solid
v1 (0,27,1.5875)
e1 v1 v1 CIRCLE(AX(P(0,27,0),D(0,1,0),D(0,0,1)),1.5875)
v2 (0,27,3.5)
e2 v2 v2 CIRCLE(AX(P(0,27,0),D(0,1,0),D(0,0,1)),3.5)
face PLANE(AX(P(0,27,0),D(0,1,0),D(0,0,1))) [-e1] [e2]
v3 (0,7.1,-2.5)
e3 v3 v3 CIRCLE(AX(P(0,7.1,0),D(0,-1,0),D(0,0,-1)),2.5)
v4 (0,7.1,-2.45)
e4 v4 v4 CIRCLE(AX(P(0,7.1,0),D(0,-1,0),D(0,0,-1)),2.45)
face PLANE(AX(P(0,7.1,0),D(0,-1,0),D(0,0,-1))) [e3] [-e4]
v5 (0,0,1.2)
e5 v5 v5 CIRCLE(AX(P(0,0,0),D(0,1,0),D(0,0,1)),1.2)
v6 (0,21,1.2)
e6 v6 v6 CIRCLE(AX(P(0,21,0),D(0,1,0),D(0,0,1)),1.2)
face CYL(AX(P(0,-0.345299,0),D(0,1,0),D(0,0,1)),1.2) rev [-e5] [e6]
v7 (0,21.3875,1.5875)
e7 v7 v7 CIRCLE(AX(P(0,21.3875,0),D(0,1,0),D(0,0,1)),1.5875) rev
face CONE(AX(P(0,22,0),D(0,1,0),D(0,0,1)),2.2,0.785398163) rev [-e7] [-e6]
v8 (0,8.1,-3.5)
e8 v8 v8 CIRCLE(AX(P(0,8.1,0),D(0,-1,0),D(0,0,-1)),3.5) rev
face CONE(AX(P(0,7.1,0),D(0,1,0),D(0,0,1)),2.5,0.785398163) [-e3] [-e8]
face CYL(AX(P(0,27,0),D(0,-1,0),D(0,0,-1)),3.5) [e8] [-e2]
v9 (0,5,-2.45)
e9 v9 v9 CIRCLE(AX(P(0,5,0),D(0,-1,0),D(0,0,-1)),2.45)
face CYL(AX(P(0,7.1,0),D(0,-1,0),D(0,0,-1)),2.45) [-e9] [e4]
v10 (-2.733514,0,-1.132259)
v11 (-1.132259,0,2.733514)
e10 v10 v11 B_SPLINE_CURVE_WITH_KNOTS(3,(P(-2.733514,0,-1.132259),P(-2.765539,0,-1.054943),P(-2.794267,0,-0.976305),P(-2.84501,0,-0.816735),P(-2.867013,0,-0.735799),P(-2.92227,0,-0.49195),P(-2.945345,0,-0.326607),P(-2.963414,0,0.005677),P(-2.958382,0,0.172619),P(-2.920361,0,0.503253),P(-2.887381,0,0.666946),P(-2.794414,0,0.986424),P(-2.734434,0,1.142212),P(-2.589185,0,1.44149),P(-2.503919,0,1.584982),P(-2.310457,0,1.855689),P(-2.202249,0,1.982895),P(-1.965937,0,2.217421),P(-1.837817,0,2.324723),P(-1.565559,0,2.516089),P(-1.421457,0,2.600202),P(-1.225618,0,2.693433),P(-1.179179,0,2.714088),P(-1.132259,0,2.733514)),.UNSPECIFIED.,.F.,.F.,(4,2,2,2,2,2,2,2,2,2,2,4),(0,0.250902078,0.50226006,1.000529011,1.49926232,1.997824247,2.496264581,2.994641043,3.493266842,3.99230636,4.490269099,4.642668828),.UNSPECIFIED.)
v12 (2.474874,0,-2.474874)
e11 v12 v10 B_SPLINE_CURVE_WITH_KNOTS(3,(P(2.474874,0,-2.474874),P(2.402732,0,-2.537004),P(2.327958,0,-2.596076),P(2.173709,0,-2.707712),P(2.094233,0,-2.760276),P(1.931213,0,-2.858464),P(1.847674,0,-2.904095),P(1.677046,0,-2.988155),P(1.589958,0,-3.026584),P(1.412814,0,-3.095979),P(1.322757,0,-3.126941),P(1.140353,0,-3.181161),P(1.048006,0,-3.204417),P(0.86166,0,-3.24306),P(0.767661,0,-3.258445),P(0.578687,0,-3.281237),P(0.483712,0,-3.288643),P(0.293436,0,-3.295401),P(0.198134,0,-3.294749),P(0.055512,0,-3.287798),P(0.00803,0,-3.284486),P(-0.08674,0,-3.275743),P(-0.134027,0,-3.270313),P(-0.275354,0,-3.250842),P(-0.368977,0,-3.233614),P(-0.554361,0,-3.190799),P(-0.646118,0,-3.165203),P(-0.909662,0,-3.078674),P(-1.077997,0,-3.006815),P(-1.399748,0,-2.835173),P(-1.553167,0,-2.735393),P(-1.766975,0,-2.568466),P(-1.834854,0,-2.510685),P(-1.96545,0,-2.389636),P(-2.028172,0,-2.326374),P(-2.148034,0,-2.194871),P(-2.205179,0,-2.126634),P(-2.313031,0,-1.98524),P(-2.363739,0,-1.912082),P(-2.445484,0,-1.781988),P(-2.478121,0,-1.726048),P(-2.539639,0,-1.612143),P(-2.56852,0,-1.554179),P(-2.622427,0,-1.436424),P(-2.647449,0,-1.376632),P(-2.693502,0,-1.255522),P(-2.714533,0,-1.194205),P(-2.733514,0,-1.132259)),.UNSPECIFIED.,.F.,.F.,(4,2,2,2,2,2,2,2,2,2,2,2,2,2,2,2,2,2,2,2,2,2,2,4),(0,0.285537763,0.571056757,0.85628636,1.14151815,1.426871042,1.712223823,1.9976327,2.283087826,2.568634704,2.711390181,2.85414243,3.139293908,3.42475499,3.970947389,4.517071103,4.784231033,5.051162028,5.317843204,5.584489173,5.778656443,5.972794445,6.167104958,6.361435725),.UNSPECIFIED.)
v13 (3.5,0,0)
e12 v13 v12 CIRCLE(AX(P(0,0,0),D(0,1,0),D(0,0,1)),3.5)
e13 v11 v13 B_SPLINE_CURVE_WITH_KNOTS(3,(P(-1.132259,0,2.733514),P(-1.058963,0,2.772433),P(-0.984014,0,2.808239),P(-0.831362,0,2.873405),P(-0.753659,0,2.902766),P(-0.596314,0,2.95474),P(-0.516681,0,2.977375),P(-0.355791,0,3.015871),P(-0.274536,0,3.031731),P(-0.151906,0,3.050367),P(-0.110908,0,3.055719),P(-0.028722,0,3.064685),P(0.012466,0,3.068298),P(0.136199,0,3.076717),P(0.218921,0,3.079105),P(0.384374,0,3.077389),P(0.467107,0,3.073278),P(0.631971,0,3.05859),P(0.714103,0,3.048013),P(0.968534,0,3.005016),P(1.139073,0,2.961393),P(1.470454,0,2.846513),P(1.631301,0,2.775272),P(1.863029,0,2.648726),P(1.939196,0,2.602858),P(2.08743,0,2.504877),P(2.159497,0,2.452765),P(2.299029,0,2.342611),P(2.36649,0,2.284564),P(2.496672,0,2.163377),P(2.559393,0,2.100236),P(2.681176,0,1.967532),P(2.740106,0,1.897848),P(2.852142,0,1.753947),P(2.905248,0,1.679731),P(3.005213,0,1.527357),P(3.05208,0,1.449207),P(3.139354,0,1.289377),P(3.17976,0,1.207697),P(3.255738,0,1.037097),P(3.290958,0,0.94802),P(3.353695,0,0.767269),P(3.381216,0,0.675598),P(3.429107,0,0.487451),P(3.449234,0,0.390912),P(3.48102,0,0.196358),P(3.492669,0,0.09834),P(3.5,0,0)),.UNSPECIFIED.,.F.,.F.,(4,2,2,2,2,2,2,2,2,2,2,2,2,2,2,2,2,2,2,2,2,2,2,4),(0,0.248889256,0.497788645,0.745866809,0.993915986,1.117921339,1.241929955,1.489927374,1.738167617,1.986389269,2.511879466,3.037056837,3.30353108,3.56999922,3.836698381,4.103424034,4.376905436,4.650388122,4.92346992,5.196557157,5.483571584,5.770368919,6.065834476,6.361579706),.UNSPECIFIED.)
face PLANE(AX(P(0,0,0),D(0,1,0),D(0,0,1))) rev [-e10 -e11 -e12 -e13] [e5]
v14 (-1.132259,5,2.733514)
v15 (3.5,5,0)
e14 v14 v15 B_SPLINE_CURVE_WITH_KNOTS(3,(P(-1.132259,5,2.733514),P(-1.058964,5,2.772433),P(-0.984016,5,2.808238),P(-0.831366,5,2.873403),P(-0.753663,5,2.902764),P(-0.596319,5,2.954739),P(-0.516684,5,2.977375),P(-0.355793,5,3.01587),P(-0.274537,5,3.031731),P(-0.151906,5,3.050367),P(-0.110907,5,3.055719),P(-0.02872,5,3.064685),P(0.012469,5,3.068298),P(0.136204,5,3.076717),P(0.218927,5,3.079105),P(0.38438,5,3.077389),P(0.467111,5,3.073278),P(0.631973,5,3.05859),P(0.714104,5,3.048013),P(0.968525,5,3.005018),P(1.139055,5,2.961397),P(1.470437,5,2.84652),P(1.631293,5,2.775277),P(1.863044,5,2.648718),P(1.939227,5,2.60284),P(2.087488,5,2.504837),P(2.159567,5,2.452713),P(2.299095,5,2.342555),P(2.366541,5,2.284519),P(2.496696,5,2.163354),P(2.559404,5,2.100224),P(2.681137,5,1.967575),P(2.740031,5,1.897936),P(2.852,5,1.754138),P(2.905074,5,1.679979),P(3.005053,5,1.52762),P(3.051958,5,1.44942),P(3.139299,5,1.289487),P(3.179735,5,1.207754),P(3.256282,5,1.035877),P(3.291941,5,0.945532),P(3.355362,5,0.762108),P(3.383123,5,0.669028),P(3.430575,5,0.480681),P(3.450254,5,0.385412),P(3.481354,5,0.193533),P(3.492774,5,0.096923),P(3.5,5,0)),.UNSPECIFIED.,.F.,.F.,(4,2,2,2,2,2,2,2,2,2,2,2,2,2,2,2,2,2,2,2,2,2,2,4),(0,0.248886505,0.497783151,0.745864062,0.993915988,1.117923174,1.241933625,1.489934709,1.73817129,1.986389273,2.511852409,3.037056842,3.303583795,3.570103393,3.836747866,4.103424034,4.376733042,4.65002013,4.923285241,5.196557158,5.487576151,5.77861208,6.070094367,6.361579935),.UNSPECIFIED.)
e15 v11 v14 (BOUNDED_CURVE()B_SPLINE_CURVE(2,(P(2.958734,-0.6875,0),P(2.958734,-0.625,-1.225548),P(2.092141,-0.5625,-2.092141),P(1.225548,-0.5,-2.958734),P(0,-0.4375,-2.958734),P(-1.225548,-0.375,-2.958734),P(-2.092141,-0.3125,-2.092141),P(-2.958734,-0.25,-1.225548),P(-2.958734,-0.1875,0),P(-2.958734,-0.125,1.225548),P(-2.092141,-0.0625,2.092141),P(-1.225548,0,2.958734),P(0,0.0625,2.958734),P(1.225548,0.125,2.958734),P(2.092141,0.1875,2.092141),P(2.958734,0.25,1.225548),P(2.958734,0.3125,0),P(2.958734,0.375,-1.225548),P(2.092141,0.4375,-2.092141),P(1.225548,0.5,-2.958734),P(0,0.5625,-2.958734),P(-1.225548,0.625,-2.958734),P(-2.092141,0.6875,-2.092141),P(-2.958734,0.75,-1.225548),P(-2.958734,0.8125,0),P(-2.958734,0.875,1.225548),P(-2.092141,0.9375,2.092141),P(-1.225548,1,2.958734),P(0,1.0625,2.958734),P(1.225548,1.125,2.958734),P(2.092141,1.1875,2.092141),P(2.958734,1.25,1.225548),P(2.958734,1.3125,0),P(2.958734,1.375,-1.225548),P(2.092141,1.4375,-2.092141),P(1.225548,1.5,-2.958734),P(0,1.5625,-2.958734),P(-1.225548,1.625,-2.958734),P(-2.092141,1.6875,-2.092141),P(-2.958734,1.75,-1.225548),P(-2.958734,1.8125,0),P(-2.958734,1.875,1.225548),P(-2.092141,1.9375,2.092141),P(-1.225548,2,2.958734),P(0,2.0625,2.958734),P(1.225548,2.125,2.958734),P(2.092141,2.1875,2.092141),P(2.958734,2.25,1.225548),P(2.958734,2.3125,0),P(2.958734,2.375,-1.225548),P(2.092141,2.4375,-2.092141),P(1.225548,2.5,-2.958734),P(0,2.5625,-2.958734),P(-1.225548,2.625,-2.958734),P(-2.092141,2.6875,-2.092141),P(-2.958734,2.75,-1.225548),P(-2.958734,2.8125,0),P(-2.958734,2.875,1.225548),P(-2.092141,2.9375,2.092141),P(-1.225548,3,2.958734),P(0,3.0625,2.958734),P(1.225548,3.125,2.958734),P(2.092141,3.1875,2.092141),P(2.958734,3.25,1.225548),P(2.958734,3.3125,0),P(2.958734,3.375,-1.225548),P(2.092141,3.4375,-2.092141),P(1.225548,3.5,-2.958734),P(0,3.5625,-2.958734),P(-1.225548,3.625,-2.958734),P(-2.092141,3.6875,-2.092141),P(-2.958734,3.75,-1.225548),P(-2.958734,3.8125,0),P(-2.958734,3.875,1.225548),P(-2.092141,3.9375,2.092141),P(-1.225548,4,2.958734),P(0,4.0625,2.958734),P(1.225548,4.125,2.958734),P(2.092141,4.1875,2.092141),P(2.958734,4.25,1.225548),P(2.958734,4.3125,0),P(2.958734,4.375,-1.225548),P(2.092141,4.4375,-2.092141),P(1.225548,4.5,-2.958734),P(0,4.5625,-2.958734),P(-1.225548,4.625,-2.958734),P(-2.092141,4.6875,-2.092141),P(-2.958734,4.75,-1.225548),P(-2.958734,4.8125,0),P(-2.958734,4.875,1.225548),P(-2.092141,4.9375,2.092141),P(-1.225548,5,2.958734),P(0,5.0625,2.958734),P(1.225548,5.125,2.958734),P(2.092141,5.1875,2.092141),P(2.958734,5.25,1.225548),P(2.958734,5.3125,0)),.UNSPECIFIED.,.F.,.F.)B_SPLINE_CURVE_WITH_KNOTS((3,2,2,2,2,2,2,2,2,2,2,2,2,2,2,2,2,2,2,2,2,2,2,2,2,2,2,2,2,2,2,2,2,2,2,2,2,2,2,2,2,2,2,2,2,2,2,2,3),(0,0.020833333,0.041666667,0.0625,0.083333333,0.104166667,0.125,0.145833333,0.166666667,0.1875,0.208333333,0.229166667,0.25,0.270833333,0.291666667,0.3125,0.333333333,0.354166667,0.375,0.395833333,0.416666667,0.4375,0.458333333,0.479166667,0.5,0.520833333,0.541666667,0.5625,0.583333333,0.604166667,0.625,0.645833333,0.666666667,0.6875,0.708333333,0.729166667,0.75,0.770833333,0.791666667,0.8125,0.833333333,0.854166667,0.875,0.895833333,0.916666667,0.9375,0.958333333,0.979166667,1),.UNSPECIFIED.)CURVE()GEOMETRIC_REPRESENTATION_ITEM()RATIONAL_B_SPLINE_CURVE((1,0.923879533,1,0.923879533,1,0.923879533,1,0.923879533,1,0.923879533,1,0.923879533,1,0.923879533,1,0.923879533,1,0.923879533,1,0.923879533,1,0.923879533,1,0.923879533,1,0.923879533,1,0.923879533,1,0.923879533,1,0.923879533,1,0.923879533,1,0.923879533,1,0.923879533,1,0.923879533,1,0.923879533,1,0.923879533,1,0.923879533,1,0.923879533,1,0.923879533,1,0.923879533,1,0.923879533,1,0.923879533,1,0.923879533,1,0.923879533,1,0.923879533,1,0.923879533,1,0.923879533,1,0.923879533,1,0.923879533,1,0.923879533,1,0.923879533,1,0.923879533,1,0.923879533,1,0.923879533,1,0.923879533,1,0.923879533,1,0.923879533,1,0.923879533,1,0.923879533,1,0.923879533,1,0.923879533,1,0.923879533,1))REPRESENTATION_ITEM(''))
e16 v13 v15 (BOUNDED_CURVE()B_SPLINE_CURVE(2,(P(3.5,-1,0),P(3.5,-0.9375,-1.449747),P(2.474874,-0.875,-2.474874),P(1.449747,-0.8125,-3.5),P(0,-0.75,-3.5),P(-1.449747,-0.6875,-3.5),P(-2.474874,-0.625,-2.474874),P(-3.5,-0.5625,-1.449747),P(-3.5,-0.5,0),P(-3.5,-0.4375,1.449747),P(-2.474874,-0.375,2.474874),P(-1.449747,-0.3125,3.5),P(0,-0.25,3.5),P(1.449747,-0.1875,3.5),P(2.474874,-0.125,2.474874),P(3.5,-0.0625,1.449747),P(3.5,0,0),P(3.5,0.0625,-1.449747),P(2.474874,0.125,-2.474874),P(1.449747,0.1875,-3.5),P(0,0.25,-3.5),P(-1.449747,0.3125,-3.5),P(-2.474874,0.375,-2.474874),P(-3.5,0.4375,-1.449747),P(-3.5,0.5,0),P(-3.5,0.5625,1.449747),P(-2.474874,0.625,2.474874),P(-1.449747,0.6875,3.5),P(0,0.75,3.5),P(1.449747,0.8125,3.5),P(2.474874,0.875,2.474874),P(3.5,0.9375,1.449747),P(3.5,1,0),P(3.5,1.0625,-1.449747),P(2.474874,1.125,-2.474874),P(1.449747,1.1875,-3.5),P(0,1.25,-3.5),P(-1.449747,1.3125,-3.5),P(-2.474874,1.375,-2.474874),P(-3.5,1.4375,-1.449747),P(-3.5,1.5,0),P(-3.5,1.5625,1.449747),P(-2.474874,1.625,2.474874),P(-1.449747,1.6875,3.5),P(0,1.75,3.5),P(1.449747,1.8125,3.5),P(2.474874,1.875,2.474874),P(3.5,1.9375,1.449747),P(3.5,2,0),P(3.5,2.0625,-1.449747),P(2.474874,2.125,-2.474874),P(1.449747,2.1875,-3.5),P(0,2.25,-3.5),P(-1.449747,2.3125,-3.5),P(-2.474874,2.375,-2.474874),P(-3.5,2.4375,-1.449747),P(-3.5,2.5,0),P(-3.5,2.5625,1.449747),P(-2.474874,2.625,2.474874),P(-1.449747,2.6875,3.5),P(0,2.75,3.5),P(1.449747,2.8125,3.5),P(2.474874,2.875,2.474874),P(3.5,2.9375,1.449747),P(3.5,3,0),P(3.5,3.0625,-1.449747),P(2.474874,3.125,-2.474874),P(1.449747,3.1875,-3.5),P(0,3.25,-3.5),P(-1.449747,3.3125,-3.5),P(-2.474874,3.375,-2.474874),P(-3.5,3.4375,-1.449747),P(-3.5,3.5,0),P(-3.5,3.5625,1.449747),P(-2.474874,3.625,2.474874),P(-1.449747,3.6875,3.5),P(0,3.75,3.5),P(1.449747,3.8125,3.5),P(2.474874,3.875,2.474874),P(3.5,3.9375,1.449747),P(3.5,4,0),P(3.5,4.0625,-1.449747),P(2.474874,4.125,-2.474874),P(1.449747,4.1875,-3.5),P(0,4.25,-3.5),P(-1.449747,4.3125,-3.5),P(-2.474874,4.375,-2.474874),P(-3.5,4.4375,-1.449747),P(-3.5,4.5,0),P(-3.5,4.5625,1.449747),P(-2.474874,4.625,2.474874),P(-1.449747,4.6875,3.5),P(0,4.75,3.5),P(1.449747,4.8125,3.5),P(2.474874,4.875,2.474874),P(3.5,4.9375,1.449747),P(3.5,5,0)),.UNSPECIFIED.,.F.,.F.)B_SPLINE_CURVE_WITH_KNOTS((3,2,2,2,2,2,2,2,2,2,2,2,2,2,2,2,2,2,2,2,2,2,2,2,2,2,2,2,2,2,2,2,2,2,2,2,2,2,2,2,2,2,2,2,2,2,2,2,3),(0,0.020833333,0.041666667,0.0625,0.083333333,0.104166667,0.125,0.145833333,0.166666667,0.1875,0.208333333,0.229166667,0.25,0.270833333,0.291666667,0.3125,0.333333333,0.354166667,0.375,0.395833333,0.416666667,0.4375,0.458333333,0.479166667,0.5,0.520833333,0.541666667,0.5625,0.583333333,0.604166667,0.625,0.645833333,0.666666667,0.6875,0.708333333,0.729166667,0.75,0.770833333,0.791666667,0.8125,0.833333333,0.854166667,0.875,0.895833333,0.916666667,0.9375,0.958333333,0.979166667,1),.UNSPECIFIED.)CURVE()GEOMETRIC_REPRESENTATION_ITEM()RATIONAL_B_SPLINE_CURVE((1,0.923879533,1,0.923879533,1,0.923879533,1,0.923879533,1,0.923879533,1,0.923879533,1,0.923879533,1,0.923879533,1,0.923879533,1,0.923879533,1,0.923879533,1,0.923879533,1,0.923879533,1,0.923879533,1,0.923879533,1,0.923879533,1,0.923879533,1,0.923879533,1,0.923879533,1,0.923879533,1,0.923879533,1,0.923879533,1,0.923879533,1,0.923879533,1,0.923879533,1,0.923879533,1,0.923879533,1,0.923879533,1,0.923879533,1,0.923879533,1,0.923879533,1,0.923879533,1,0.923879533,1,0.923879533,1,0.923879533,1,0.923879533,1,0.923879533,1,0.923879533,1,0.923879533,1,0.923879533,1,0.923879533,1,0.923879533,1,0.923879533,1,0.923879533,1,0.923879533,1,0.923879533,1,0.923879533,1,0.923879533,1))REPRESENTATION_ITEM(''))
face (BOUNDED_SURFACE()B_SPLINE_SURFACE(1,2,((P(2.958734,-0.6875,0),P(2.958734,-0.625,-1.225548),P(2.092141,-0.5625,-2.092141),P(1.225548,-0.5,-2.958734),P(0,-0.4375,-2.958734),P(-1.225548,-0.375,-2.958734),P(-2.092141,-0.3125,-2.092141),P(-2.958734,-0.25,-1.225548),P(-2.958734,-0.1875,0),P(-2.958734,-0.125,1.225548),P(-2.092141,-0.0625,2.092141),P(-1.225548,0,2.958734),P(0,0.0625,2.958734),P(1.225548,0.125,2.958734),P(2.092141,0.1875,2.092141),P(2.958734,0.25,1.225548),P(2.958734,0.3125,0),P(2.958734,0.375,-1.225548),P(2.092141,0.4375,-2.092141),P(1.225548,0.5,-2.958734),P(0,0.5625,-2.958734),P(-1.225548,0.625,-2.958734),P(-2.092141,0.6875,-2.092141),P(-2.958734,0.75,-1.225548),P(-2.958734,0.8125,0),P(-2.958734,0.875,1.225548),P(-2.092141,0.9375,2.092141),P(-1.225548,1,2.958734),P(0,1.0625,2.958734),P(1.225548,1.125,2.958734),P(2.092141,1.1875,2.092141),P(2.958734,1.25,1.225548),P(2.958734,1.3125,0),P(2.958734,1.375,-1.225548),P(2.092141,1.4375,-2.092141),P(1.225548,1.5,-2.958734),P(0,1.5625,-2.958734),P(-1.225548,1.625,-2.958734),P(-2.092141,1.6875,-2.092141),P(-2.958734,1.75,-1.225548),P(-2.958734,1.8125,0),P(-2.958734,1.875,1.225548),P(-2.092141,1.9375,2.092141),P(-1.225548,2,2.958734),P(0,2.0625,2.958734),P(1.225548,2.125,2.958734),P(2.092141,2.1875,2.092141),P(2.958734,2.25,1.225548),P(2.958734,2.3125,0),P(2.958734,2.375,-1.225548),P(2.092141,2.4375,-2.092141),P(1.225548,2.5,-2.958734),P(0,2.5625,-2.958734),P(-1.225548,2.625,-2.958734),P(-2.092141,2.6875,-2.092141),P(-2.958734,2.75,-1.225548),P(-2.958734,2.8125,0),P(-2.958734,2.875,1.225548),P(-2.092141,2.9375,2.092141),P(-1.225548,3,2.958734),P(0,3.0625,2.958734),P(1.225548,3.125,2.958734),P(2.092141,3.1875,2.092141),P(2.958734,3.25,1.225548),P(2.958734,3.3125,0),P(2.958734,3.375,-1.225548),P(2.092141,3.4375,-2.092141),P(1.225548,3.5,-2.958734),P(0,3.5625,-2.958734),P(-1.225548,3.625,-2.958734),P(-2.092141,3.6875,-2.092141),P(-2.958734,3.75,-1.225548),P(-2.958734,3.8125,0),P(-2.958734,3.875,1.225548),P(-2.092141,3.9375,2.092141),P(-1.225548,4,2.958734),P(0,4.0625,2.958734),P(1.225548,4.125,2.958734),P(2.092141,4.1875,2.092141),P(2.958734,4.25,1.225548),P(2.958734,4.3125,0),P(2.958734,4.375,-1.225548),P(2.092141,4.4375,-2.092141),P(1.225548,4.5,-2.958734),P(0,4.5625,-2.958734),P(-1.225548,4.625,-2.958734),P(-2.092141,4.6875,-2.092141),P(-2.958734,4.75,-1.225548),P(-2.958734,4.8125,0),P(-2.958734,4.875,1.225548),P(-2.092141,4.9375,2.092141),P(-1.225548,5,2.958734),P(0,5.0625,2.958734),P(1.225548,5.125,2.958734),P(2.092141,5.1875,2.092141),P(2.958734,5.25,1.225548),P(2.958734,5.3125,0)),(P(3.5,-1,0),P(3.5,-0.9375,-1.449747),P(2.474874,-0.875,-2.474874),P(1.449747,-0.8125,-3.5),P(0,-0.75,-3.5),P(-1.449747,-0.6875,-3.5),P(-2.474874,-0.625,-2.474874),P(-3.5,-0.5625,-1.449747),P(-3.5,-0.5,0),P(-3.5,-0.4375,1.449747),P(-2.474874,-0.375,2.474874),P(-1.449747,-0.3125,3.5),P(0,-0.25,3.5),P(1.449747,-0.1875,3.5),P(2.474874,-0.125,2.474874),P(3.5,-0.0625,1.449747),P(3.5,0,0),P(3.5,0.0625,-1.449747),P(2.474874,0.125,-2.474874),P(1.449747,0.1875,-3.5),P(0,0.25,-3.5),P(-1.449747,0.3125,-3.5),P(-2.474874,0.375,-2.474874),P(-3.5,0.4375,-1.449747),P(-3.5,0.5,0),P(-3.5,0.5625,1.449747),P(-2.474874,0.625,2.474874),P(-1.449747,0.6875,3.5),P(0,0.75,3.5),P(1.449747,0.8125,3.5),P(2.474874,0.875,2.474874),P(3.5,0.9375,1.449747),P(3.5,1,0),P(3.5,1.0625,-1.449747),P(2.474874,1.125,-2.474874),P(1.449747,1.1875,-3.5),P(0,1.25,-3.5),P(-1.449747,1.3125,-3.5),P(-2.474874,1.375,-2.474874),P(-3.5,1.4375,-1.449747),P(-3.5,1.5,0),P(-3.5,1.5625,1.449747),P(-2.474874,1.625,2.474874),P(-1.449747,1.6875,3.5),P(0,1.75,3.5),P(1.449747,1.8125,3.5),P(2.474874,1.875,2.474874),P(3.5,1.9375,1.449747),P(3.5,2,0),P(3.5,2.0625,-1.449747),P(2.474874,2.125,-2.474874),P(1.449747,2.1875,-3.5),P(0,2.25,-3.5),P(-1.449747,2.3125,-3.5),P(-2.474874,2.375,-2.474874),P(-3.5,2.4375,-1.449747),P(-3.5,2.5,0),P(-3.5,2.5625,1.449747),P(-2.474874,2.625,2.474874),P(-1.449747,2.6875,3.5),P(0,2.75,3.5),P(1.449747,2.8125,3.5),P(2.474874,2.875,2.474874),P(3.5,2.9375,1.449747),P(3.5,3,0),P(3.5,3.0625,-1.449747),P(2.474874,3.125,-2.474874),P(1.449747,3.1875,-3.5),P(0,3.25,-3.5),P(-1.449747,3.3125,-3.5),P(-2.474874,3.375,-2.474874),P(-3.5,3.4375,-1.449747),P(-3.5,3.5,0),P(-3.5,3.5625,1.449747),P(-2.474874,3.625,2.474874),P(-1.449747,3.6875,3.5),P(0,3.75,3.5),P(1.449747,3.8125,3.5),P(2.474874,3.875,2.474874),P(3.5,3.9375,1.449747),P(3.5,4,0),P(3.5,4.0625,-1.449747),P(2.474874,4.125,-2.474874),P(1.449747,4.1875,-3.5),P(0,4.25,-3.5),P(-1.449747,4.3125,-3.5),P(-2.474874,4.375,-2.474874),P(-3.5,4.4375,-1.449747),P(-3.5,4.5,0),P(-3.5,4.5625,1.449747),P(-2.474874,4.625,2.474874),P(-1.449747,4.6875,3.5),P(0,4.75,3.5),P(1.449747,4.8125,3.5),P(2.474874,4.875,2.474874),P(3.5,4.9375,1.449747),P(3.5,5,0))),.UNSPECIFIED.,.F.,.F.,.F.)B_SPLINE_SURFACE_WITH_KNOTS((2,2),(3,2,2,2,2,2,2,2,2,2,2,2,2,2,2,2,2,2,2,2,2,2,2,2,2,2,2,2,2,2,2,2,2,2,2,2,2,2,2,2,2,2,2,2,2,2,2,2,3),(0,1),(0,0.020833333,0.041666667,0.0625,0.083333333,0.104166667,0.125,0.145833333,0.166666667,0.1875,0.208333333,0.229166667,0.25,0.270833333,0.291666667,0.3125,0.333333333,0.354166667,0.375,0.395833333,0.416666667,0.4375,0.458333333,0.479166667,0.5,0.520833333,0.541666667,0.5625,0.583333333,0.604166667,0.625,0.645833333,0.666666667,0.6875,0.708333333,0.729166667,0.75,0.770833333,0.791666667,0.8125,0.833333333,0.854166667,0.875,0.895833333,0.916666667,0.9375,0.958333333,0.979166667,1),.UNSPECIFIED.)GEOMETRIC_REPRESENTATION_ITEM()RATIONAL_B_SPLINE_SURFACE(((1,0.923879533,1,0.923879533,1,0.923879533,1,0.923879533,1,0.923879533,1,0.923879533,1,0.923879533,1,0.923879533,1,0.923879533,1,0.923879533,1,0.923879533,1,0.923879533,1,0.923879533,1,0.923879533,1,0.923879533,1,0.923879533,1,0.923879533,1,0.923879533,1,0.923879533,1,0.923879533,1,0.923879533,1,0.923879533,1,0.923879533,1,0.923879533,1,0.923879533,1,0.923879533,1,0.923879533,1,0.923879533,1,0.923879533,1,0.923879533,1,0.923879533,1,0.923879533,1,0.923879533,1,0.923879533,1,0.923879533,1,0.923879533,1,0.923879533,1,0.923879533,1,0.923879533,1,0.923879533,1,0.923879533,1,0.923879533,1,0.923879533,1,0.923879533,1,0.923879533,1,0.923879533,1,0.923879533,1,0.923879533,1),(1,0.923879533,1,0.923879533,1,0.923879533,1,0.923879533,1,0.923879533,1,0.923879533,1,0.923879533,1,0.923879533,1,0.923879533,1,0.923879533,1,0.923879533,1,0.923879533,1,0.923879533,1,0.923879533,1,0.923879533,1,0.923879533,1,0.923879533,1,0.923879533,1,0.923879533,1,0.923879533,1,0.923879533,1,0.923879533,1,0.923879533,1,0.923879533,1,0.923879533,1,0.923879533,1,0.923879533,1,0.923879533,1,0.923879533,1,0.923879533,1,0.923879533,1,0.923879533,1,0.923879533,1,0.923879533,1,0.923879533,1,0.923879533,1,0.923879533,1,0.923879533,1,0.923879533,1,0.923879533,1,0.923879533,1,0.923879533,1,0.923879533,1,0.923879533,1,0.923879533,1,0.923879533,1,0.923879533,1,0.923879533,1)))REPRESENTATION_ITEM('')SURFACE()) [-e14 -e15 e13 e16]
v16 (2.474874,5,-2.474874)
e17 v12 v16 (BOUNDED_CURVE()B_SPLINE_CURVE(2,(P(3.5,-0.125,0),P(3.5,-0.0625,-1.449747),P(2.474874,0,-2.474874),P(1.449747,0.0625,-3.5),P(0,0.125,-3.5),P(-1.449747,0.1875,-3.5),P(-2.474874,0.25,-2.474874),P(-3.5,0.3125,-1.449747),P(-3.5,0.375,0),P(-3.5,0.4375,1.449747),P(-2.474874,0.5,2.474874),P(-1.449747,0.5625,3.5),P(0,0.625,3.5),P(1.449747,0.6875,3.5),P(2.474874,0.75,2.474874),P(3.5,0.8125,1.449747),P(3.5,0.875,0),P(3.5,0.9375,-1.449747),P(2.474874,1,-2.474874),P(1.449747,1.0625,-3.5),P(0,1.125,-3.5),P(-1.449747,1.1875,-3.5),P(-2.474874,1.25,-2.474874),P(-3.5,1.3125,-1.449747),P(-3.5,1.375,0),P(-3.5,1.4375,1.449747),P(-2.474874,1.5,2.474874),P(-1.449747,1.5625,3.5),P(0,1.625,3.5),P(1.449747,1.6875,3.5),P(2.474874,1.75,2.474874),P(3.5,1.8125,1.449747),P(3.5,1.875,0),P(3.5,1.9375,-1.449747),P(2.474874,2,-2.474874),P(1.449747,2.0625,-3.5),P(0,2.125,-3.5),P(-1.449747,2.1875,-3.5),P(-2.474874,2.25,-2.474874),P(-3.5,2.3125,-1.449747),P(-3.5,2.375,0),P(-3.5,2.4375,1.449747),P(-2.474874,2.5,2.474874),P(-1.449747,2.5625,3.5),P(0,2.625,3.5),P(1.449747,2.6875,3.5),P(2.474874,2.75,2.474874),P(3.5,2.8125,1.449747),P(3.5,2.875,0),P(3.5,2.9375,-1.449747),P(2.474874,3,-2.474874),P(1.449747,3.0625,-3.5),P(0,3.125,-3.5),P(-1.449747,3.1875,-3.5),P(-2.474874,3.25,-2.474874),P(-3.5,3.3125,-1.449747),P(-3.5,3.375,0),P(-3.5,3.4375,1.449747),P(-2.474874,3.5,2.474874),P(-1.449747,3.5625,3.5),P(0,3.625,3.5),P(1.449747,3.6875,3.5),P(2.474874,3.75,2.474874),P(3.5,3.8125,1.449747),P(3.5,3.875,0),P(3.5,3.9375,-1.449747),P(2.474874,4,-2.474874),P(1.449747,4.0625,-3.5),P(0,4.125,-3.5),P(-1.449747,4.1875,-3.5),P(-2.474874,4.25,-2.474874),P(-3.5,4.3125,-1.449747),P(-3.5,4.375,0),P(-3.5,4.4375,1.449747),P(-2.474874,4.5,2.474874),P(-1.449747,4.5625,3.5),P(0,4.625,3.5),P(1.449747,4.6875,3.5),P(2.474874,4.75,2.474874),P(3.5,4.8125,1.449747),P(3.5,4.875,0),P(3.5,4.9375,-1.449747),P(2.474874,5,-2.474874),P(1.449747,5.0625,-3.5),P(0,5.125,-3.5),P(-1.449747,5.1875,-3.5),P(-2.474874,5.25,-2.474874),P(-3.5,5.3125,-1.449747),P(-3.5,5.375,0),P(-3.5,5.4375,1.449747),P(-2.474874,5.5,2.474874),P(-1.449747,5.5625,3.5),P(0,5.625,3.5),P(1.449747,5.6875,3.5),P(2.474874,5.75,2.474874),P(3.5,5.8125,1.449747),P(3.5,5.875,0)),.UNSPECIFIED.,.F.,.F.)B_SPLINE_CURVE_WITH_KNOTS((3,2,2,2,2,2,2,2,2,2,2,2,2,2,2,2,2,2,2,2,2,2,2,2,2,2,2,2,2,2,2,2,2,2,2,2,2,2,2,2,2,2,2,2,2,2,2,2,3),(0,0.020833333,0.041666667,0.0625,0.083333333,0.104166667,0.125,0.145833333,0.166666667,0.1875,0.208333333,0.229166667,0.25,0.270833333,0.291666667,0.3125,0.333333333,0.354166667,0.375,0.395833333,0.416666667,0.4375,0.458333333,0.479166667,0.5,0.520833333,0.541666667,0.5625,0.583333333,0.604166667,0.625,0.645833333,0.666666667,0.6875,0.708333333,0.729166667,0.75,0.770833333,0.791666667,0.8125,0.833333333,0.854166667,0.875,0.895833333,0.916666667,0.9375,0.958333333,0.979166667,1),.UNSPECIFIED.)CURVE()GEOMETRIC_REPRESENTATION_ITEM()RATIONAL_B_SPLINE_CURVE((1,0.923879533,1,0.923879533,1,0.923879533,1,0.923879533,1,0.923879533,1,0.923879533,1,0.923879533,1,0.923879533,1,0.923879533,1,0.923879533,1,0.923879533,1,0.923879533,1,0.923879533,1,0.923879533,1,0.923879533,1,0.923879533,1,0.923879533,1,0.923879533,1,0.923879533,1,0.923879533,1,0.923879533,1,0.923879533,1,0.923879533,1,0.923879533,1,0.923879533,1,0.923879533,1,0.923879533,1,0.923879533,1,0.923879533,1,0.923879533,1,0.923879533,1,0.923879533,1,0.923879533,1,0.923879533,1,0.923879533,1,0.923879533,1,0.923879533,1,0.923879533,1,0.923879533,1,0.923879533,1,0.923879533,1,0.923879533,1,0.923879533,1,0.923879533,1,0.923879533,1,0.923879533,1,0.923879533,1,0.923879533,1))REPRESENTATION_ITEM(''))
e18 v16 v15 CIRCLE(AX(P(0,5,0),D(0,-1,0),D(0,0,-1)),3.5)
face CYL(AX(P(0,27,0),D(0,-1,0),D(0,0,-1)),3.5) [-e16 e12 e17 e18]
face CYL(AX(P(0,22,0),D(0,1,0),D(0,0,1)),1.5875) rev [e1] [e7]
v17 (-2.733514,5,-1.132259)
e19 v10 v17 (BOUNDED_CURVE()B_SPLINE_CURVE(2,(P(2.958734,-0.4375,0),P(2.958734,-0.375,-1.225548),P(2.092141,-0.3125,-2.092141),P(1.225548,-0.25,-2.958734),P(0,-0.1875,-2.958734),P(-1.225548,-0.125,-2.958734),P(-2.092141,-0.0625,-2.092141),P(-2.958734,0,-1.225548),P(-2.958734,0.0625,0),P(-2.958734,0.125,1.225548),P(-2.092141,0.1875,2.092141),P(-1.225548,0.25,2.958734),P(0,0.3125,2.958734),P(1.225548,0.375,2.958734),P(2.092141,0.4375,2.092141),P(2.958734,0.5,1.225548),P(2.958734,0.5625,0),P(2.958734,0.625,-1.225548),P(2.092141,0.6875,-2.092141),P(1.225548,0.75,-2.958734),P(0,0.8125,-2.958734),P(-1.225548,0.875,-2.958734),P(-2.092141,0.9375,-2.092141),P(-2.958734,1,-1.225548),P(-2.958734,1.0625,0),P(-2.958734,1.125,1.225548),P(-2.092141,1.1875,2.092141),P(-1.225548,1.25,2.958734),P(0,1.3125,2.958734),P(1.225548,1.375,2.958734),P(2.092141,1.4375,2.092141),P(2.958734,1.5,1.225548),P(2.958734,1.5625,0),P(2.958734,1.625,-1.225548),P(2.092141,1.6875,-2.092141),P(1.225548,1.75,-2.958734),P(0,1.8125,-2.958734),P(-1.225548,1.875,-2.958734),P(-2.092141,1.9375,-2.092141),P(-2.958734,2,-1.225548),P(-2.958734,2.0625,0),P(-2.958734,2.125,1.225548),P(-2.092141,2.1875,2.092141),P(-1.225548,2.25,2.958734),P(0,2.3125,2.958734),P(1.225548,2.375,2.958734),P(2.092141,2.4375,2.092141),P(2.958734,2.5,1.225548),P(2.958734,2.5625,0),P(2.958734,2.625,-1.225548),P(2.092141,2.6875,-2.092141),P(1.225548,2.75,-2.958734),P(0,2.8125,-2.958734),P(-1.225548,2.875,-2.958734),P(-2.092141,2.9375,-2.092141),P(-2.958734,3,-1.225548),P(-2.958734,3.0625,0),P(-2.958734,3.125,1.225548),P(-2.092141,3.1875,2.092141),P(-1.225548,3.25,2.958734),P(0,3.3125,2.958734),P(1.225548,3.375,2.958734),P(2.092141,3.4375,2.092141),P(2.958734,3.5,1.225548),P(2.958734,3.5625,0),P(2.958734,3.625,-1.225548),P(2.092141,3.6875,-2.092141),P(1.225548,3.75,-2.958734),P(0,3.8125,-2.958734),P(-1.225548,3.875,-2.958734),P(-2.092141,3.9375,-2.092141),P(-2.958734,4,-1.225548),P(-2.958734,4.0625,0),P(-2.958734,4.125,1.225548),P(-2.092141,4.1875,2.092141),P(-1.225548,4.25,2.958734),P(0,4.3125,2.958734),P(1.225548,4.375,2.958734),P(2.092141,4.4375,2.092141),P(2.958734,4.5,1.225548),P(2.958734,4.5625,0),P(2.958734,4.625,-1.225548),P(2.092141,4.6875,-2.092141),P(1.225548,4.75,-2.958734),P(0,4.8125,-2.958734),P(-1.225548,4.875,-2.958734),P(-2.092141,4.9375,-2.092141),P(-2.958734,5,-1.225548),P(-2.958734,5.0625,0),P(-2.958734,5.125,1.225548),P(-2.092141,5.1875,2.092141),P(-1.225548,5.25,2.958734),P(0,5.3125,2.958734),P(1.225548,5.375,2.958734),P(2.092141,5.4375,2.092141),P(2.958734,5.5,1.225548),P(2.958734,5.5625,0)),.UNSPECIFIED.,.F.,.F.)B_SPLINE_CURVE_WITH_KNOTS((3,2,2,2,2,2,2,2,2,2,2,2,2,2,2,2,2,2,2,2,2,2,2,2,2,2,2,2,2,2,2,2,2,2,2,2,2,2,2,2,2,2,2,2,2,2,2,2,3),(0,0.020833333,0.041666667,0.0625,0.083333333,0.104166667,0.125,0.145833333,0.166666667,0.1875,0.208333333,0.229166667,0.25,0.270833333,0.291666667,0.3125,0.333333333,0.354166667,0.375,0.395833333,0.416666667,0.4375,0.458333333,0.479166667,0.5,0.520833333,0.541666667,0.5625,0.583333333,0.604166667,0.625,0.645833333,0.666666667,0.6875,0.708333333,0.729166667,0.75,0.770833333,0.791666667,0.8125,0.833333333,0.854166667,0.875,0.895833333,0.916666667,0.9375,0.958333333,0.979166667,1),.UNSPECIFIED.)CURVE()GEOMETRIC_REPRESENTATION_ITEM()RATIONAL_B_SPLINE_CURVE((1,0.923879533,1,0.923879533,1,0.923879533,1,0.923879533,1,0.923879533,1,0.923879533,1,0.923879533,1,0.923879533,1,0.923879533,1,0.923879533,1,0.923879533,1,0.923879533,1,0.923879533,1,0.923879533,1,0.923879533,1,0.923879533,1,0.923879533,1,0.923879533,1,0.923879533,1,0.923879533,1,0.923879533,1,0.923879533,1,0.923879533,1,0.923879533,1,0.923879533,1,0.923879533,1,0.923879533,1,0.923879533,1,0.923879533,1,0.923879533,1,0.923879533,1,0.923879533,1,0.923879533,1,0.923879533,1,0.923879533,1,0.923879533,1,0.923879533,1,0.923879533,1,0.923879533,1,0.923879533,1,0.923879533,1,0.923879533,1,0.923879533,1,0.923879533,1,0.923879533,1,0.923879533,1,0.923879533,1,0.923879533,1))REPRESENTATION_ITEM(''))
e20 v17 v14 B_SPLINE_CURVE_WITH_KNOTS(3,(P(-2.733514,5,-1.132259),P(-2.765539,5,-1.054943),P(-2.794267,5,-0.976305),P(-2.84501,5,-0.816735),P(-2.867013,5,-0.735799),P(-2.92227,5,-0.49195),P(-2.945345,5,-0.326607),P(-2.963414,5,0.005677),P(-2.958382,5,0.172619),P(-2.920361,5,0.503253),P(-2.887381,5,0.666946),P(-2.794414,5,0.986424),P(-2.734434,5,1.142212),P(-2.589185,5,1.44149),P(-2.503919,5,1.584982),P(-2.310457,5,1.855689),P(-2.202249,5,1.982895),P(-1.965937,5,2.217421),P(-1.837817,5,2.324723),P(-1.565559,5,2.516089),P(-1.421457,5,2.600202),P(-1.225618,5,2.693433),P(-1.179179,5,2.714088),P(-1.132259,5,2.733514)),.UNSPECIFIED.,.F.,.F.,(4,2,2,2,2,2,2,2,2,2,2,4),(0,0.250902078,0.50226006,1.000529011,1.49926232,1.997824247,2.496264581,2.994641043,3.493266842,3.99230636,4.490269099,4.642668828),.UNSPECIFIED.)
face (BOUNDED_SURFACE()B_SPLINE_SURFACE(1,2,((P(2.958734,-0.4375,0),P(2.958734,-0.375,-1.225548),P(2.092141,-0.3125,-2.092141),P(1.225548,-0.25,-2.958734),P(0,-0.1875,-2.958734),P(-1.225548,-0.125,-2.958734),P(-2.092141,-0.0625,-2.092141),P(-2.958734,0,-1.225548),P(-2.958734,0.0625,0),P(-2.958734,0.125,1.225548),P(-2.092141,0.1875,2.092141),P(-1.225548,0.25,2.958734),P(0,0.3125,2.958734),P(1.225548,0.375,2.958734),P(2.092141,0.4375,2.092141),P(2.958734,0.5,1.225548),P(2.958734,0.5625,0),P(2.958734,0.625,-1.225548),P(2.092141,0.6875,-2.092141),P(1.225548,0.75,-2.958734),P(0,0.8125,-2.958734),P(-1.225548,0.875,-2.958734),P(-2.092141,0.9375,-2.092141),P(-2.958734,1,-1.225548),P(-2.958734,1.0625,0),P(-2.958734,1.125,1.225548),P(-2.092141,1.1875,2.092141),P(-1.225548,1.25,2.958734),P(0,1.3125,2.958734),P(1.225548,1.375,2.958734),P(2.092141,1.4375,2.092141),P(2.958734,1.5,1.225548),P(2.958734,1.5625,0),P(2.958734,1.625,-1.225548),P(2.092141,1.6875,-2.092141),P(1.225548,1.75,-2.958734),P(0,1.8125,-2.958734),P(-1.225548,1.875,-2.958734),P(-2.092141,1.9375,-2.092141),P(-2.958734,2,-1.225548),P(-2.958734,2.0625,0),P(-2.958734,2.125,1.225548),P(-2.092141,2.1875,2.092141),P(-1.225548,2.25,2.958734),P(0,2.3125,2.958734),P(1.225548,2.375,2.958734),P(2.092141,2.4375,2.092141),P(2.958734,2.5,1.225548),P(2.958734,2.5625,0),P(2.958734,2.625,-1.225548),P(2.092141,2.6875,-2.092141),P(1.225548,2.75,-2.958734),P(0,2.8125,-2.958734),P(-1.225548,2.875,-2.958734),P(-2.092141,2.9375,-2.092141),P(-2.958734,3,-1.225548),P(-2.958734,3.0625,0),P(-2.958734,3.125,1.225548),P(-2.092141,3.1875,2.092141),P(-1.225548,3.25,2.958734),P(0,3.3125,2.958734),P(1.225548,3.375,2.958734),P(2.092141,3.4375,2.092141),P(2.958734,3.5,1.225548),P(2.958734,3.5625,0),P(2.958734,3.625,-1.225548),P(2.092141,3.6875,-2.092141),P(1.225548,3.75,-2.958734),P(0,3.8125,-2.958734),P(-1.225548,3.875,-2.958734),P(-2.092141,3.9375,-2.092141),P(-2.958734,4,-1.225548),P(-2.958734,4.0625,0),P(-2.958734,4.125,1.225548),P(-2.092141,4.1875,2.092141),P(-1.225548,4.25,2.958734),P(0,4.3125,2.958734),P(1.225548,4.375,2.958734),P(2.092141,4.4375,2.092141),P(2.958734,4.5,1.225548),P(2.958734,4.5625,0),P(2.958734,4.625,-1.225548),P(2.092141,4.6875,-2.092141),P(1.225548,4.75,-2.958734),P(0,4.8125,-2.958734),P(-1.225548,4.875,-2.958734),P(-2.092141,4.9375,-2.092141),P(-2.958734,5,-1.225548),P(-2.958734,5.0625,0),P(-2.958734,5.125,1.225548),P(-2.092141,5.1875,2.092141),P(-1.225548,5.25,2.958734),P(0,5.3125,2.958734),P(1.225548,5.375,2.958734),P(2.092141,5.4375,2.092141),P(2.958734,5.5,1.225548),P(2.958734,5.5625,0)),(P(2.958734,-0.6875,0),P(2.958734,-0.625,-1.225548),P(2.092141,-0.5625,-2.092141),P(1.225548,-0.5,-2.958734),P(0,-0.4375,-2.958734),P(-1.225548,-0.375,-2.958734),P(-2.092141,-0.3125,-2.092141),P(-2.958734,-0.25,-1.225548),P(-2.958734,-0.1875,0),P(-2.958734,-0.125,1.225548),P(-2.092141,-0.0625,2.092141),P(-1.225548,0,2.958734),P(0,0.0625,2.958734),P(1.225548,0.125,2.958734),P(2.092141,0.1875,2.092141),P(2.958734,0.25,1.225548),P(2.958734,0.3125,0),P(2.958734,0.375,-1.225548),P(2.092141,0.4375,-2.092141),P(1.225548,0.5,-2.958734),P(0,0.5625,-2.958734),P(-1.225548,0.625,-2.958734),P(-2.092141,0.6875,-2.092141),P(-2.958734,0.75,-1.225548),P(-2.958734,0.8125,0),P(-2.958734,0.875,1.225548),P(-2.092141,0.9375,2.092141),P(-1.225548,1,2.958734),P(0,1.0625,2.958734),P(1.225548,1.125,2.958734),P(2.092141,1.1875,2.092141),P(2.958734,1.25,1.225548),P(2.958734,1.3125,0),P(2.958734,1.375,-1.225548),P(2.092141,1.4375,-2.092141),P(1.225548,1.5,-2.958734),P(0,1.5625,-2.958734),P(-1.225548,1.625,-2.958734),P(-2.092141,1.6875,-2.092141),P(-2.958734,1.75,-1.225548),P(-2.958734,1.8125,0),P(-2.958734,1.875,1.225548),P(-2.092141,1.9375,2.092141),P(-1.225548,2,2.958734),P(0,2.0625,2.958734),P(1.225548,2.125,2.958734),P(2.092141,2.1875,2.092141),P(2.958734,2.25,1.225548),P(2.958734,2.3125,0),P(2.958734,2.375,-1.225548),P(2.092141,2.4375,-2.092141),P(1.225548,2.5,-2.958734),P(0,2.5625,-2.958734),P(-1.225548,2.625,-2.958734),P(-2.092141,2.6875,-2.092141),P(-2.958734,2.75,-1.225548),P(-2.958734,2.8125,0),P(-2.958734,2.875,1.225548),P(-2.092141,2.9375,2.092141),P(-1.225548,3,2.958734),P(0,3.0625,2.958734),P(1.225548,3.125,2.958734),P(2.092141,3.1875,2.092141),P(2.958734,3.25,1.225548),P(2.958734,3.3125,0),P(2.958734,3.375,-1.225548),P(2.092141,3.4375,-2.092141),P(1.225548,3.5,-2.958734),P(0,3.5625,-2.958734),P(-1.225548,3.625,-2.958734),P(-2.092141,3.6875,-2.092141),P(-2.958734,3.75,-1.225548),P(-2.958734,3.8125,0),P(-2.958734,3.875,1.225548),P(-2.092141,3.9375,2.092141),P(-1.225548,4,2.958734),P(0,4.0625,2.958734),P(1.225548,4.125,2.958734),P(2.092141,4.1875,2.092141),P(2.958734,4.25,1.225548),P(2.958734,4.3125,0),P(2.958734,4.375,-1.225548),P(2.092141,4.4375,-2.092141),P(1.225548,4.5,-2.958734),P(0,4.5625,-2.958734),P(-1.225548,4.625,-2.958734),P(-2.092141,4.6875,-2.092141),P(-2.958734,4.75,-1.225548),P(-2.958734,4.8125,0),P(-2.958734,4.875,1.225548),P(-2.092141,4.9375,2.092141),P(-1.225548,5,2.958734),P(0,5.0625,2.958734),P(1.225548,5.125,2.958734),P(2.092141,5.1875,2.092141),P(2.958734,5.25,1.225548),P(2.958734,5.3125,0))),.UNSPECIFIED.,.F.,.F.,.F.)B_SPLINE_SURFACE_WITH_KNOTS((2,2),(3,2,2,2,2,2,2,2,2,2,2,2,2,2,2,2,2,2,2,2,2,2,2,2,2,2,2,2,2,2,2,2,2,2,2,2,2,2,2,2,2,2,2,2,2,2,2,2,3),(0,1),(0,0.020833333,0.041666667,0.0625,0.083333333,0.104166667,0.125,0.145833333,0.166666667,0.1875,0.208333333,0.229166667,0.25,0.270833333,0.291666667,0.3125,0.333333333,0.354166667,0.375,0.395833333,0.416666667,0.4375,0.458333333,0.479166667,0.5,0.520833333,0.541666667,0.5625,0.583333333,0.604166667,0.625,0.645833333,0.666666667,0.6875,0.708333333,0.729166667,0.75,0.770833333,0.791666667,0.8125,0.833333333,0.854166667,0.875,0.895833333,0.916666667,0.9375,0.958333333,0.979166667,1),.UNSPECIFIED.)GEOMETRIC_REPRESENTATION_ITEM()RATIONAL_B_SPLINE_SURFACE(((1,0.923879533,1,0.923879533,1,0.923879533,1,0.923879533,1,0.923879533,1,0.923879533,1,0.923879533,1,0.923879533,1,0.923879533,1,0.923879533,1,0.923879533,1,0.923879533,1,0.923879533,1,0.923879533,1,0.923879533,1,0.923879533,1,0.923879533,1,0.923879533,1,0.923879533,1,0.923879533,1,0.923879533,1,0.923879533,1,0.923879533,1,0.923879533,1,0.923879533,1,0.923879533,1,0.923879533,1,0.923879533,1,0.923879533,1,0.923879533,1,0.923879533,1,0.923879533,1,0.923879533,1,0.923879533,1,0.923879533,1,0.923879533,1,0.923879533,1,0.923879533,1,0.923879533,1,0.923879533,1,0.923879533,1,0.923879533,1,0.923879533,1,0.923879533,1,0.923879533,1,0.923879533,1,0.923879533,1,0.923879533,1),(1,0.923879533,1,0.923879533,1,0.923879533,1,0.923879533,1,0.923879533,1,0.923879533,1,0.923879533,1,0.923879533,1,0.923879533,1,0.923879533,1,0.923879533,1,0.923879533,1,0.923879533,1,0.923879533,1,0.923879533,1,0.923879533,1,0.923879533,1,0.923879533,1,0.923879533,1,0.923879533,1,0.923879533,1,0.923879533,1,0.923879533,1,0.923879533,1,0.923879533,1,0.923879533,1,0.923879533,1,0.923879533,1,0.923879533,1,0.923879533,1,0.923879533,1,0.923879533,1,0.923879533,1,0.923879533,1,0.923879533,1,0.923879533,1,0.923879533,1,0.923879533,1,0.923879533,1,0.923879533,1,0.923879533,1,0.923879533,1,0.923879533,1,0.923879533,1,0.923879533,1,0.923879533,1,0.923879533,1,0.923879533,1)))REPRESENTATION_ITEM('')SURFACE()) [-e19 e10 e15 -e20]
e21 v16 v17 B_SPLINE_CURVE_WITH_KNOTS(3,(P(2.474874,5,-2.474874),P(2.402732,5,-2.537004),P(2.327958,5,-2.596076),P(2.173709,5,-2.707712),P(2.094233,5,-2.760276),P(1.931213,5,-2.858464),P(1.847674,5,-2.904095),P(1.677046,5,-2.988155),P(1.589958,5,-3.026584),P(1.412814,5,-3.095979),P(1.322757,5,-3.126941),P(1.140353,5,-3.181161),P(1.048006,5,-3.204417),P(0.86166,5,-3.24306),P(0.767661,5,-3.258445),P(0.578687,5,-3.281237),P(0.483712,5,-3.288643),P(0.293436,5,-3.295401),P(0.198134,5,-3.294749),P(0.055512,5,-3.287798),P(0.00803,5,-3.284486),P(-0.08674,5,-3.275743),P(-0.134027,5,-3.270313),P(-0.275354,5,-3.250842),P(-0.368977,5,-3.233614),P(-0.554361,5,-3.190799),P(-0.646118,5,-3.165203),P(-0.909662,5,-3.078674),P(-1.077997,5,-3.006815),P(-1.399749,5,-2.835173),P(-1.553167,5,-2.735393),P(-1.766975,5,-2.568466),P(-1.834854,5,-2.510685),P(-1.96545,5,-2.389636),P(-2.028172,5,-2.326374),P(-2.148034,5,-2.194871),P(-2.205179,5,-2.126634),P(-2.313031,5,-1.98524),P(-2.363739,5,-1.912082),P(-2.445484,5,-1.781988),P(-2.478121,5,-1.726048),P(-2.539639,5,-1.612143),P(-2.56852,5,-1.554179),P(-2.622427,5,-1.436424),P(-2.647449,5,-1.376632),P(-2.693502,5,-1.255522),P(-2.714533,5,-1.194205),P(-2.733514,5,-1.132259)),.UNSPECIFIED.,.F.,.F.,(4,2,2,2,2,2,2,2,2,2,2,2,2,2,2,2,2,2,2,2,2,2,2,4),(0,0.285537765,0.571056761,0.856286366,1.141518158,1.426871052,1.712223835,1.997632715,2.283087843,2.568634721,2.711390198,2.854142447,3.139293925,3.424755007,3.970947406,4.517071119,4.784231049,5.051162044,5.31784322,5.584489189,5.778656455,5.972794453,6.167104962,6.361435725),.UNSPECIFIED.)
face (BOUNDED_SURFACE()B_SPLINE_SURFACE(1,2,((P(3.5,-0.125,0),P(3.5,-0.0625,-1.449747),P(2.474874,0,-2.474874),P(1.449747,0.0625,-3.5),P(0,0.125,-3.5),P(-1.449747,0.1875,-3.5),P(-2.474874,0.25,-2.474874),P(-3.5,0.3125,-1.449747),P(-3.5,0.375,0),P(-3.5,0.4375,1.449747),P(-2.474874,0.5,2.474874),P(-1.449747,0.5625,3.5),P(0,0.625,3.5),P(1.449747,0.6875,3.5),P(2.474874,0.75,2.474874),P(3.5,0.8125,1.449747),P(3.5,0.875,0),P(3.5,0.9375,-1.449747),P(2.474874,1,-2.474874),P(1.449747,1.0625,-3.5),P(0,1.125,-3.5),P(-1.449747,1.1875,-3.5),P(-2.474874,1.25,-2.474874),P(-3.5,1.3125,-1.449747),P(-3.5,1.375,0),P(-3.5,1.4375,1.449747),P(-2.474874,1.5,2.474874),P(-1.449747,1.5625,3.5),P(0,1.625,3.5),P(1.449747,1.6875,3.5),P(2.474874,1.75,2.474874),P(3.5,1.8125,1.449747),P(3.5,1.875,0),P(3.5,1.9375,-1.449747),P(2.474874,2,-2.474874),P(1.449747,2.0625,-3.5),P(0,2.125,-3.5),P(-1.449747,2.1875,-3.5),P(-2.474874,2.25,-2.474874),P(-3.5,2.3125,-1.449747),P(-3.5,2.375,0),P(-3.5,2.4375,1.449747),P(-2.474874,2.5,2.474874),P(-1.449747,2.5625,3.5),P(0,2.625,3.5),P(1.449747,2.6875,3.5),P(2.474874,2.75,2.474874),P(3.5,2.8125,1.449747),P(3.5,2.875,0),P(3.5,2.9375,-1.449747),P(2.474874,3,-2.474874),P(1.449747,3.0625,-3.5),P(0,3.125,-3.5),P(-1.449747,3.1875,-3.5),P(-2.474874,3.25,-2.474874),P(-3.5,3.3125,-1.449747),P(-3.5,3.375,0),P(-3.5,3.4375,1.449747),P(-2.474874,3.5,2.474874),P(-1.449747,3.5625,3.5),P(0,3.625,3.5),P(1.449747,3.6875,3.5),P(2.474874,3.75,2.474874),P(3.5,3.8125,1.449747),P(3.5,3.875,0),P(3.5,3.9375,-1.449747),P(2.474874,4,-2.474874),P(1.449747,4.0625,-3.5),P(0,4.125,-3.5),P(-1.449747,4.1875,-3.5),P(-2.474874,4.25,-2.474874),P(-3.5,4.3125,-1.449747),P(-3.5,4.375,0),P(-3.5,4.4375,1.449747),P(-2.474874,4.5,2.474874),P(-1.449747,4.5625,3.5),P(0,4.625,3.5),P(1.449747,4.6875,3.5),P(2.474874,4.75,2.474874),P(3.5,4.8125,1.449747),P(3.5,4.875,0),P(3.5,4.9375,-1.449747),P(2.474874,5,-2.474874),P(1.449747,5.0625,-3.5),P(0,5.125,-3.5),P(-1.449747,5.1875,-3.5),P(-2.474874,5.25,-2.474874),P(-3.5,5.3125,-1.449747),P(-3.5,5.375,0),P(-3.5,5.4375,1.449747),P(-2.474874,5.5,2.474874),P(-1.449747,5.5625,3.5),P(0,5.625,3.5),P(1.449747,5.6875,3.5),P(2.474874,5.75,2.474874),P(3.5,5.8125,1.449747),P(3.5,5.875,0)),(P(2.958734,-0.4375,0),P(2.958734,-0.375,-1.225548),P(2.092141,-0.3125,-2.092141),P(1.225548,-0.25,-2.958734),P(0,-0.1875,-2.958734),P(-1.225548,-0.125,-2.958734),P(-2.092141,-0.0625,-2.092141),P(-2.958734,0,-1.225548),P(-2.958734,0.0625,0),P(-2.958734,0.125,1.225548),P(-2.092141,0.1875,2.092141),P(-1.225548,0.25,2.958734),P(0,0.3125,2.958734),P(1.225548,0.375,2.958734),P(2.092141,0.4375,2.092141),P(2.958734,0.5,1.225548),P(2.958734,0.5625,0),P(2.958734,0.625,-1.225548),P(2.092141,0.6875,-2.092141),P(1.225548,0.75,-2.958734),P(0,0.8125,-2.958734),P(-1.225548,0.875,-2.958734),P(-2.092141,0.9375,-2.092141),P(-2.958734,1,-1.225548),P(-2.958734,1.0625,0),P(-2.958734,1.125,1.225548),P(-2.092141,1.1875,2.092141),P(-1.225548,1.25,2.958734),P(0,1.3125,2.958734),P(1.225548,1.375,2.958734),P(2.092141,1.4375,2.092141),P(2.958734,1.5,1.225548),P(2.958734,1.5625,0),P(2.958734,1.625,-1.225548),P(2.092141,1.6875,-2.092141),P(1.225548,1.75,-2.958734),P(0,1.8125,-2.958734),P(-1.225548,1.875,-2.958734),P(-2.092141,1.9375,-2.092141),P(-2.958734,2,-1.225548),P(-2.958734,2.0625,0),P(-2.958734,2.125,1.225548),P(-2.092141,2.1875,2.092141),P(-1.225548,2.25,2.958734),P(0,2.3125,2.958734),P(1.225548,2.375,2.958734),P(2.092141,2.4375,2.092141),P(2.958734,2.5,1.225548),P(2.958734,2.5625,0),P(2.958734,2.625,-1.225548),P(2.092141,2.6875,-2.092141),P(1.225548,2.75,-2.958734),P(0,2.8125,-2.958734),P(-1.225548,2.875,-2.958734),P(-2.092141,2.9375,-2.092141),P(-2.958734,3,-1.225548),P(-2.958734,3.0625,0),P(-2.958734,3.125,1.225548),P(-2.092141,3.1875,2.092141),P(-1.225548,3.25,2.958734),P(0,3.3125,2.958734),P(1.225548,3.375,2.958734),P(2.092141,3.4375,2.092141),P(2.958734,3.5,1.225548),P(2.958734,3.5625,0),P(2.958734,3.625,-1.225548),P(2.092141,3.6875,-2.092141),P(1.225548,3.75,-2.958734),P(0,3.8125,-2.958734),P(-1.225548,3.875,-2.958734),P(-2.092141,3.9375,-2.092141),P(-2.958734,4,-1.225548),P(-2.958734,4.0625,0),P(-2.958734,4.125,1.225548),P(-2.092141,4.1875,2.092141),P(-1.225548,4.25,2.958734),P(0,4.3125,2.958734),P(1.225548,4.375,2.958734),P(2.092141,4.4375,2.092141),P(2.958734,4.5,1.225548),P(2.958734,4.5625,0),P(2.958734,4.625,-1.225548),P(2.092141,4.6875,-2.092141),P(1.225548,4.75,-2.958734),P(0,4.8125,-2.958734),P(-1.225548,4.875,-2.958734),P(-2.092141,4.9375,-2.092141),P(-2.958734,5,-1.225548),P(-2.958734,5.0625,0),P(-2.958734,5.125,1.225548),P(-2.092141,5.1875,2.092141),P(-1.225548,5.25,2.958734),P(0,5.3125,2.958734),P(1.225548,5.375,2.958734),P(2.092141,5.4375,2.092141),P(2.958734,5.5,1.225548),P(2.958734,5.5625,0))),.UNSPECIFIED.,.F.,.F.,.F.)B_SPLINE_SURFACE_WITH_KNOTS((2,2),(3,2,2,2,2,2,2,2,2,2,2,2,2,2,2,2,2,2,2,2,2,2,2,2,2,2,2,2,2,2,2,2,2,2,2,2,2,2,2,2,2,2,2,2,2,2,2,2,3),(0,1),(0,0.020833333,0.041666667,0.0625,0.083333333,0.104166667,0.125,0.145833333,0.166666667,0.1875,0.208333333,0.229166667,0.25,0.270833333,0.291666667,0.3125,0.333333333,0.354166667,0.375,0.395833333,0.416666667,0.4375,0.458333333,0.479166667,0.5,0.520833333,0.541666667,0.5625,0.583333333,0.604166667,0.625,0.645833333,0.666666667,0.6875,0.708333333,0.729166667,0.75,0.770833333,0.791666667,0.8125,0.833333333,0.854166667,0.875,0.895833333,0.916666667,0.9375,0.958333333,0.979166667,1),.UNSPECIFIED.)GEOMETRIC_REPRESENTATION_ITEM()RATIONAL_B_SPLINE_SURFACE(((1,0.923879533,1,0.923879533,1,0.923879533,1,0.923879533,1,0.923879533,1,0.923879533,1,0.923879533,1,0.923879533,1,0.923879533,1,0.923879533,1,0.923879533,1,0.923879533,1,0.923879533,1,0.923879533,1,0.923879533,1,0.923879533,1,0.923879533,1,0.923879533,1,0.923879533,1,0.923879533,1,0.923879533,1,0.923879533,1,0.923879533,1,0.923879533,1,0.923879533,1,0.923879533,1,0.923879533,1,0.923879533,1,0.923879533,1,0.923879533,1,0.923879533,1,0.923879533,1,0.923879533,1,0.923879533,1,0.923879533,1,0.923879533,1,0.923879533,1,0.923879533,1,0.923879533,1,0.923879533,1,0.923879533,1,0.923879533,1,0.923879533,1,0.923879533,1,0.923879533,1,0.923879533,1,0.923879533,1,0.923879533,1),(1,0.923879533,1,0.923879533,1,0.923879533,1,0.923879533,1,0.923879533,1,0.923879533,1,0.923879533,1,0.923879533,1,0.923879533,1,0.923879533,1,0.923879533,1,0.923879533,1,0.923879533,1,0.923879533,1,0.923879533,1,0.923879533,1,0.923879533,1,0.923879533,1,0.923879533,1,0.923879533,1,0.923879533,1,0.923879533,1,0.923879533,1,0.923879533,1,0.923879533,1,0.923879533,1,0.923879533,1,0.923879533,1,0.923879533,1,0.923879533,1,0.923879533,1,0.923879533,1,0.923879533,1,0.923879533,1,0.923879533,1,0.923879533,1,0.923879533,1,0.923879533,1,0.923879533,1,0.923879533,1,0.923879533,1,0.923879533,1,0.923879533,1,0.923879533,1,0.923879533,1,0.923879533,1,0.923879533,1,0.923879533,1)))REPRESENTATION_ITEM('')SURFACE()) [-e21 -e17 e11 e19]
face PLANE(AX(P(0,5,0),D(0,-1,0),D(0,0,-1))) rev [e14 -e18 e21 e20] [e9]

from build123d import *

# Parameters (mm, degrees)
CROQUIS2_R                   = 3.5
SALIENTE_EXTRUIR1_DEPTH      = 27
ROSCA1_PITCH                 = 1
CROQUIS5_R                   = 12.45
CROQUIS5_R_2                 = 2.45
CORTAR_EXTRUIR_L_MINA1_DEPTH = 2.1
CROQUIS6_R                   = 1.2
CORTAR_EXTRUIR1_DEPTH        = 28.449954628
CHAFL_N1_SIZE                = 1
CROQUIS8_R                   = 1.5875
CORTAR_EXTRUIR2_DEPTH        = 5
CHAFL_N2_SIZE                = 1


with BuildPart() as part:
    # Croquis2 → Saliente-Extruir1 (new body)
    with BuildSketch(Plane(origin=(0, 0, 0), x_dir=(1, 0, 0), z_dir=(0, 1, 0))):
        with Locations(Location((0, 0, 0), (0, 0, 270))):
            Circle(CROQUIS2_R)
    extrude(amount=SALIENTE_EXTRUIR1_DEPTH)

    # Rosca1: the profile of Perfil de rosca1 profile screwed along a right-hand helix of 6 turns, 8 arcs to a turn; built about Z, then put on its axis
    rosca1_z = Axis((0, 0, 0), (0, 0, 1))
    rosca1_corners = [(3.5003, 0, -0.000173205), (3.5003, 0, 0.875173202), (2.958734125, 0, 0.562499999), (2.958734125, 0, 0.312499999)]
    with BuildLine(mode=Mode.PRIVATE) as rosca1_profile:
        Line(rosca1_corners[0], rosca1_corners[1])
        Line(rosca1_corners[1], rosca1_corners[2])
        Line(rosca1_corners[2], rosca1_corners[3])
        Line(rosca1_corners[3], rosca1_corners[0])
    rosca1_cap = Face(rosca1_profile.wire())
    rosca1_turn_angles = [0, 22.5, 45, 67.5, 90, 112.5, 135, 157.5, 180, 202.5, 225, 247.5, 270, 292.5, 315, 337.5, 360]
    rosca1_turn_weights = [1, 0.9238795325112867, 1, 0.9238795325112867, 1, 0.9238795325112867, 1, 0.9238795325112867, 1, 0.9238795325112867, 1, 0.9238795325112867, 1, 0.9238795325112867, 1, 0.9238795325112867, 1]
    rosca1_turn_rails = [Edge.make_bspline([Vector(p[0], p[1], 0).rotate(rosca1_z, rosca1_turn_angles[k]) / rosca1_turn_weights[k] + Vector(0, 0, p[2] + ROSCA1_PITCH * rosca1_turn_angles[k] / 360) for k in range(17)], [0, 0, 0, 1, 1, 2, 2, 3, 3, 4, 4, 5, 5, 6, 6, 7, 7, 8, 8, 8], 2, rosca1_turn_weights) for p in rosca1_corners]
    rosca1_turn_sides = [Face.make_surface_from_curves(rosca1_turn_rails[p[0]], rosca1_turn_rails[p[1]]) for p in [(0, 1), (1, 2), (2, 3), (3, 0)]]
    rosca1 = Plane(origin=(0, -1, 0), x_dir=(1, 0, 0), z_dir=(0, 1, 0)) * Solid(Shell([*[p.moved(Location((0, 0, ROSCA1_PITCH * i))) for i in range(6) for p in rosca1_turn_sides], rosca1_cap, rosca1_cap.rotate(rosca1_z, 2160).moved(Location((0, 0, ROSCA1_PITCH * 2160 / 360)))]))
    add(rosca1, mode=Mode.SUBTRACT)

    # Croquis5 → Cortar-Extruir-Lámina1 (cut)
    with BuildSketch(Plane(origin=(0, 5, 0), x_dir=(-1, 0, 0), z_dir=(0, -1, 0))):
        Circle(CROQUIS5_R)
        Circle(CROQUIS5_R_2, mode=Mode.SUBTRACT)
    extrude(amount=-CORTAR_EXTRUIR_L_MINA1_DEPTH, mode=Mode.SUBTRACT)

    # Croquis6 → Cortar-Extruir1 (cut, through all)
    with BuildSketch(Plane(origin=(0, 27, 0), x_dir=(1, 0, 0), z_dir=(0, 1, 0))):
        with Locations(Location((0, 0, 0), (0, 0, 270))):
            Circle(CROQUIS6_R)
    extrude(amount=-CORTAR_EXTRUIR1_DEPTH, mode=Mode.SUBTRACT)

    # Chaflán1
    chafl_n1_edges = [part.edges().sort_by_distance(p)[0] for p in [
        (0, 7.1, -3.5),
    ]]
    chamfer(chafl_n1_edges, length=CHAFL_N1_SIZE)

    # Croquis8 → Cortar-Extruir2 (cut)
    with BuildSketch(Plane(origin=(0, 27, 0), x_dir=(1, 0, 0), z_dir=(0, 1, 0))):
        with Locations(Location((0, 0, 0), (0, 0, 270))):
            Circle(CROQUIS8_R)
    extrude(amount=-CORTAR_EXTRUIR2_DEPTH, mode=Mode.SUBTRACT)

    # Chaflán2
    # the kernel refuses this chamfer: 1 mm, written as the material it takes off along each edge
    with BuildSketch(Plane(origin=(0, 22, 0), x_dir=(0, 0, 1), z_dir=(-1, 0, 0))) as chafl_n2_piece_1_section:
        Polygon((1.2 + CHAFL_N2_SIZE, 0), (1.2, -CHAFL_N2_SIZE), (1.2, 0), align=None)
    chafl_n2_piece_1 = revolve(axis=Axis((0, 22, 0), (0, 1, 0)), mode=Mode.PRIVATE)
    chafl_n2_piece_1 = chafl_n2_piece_1 & Plane(origin=(0, 21.189751439, 0), x_dir=(0, 0, 1), z_dir=(0, 1, 0)) * Cylinder(1.5875, 9, mode=Mode.PRIVATE)
    add(chafl_n2_piece_1, mode=Mode.SUBTRACT)


solid = part.part
